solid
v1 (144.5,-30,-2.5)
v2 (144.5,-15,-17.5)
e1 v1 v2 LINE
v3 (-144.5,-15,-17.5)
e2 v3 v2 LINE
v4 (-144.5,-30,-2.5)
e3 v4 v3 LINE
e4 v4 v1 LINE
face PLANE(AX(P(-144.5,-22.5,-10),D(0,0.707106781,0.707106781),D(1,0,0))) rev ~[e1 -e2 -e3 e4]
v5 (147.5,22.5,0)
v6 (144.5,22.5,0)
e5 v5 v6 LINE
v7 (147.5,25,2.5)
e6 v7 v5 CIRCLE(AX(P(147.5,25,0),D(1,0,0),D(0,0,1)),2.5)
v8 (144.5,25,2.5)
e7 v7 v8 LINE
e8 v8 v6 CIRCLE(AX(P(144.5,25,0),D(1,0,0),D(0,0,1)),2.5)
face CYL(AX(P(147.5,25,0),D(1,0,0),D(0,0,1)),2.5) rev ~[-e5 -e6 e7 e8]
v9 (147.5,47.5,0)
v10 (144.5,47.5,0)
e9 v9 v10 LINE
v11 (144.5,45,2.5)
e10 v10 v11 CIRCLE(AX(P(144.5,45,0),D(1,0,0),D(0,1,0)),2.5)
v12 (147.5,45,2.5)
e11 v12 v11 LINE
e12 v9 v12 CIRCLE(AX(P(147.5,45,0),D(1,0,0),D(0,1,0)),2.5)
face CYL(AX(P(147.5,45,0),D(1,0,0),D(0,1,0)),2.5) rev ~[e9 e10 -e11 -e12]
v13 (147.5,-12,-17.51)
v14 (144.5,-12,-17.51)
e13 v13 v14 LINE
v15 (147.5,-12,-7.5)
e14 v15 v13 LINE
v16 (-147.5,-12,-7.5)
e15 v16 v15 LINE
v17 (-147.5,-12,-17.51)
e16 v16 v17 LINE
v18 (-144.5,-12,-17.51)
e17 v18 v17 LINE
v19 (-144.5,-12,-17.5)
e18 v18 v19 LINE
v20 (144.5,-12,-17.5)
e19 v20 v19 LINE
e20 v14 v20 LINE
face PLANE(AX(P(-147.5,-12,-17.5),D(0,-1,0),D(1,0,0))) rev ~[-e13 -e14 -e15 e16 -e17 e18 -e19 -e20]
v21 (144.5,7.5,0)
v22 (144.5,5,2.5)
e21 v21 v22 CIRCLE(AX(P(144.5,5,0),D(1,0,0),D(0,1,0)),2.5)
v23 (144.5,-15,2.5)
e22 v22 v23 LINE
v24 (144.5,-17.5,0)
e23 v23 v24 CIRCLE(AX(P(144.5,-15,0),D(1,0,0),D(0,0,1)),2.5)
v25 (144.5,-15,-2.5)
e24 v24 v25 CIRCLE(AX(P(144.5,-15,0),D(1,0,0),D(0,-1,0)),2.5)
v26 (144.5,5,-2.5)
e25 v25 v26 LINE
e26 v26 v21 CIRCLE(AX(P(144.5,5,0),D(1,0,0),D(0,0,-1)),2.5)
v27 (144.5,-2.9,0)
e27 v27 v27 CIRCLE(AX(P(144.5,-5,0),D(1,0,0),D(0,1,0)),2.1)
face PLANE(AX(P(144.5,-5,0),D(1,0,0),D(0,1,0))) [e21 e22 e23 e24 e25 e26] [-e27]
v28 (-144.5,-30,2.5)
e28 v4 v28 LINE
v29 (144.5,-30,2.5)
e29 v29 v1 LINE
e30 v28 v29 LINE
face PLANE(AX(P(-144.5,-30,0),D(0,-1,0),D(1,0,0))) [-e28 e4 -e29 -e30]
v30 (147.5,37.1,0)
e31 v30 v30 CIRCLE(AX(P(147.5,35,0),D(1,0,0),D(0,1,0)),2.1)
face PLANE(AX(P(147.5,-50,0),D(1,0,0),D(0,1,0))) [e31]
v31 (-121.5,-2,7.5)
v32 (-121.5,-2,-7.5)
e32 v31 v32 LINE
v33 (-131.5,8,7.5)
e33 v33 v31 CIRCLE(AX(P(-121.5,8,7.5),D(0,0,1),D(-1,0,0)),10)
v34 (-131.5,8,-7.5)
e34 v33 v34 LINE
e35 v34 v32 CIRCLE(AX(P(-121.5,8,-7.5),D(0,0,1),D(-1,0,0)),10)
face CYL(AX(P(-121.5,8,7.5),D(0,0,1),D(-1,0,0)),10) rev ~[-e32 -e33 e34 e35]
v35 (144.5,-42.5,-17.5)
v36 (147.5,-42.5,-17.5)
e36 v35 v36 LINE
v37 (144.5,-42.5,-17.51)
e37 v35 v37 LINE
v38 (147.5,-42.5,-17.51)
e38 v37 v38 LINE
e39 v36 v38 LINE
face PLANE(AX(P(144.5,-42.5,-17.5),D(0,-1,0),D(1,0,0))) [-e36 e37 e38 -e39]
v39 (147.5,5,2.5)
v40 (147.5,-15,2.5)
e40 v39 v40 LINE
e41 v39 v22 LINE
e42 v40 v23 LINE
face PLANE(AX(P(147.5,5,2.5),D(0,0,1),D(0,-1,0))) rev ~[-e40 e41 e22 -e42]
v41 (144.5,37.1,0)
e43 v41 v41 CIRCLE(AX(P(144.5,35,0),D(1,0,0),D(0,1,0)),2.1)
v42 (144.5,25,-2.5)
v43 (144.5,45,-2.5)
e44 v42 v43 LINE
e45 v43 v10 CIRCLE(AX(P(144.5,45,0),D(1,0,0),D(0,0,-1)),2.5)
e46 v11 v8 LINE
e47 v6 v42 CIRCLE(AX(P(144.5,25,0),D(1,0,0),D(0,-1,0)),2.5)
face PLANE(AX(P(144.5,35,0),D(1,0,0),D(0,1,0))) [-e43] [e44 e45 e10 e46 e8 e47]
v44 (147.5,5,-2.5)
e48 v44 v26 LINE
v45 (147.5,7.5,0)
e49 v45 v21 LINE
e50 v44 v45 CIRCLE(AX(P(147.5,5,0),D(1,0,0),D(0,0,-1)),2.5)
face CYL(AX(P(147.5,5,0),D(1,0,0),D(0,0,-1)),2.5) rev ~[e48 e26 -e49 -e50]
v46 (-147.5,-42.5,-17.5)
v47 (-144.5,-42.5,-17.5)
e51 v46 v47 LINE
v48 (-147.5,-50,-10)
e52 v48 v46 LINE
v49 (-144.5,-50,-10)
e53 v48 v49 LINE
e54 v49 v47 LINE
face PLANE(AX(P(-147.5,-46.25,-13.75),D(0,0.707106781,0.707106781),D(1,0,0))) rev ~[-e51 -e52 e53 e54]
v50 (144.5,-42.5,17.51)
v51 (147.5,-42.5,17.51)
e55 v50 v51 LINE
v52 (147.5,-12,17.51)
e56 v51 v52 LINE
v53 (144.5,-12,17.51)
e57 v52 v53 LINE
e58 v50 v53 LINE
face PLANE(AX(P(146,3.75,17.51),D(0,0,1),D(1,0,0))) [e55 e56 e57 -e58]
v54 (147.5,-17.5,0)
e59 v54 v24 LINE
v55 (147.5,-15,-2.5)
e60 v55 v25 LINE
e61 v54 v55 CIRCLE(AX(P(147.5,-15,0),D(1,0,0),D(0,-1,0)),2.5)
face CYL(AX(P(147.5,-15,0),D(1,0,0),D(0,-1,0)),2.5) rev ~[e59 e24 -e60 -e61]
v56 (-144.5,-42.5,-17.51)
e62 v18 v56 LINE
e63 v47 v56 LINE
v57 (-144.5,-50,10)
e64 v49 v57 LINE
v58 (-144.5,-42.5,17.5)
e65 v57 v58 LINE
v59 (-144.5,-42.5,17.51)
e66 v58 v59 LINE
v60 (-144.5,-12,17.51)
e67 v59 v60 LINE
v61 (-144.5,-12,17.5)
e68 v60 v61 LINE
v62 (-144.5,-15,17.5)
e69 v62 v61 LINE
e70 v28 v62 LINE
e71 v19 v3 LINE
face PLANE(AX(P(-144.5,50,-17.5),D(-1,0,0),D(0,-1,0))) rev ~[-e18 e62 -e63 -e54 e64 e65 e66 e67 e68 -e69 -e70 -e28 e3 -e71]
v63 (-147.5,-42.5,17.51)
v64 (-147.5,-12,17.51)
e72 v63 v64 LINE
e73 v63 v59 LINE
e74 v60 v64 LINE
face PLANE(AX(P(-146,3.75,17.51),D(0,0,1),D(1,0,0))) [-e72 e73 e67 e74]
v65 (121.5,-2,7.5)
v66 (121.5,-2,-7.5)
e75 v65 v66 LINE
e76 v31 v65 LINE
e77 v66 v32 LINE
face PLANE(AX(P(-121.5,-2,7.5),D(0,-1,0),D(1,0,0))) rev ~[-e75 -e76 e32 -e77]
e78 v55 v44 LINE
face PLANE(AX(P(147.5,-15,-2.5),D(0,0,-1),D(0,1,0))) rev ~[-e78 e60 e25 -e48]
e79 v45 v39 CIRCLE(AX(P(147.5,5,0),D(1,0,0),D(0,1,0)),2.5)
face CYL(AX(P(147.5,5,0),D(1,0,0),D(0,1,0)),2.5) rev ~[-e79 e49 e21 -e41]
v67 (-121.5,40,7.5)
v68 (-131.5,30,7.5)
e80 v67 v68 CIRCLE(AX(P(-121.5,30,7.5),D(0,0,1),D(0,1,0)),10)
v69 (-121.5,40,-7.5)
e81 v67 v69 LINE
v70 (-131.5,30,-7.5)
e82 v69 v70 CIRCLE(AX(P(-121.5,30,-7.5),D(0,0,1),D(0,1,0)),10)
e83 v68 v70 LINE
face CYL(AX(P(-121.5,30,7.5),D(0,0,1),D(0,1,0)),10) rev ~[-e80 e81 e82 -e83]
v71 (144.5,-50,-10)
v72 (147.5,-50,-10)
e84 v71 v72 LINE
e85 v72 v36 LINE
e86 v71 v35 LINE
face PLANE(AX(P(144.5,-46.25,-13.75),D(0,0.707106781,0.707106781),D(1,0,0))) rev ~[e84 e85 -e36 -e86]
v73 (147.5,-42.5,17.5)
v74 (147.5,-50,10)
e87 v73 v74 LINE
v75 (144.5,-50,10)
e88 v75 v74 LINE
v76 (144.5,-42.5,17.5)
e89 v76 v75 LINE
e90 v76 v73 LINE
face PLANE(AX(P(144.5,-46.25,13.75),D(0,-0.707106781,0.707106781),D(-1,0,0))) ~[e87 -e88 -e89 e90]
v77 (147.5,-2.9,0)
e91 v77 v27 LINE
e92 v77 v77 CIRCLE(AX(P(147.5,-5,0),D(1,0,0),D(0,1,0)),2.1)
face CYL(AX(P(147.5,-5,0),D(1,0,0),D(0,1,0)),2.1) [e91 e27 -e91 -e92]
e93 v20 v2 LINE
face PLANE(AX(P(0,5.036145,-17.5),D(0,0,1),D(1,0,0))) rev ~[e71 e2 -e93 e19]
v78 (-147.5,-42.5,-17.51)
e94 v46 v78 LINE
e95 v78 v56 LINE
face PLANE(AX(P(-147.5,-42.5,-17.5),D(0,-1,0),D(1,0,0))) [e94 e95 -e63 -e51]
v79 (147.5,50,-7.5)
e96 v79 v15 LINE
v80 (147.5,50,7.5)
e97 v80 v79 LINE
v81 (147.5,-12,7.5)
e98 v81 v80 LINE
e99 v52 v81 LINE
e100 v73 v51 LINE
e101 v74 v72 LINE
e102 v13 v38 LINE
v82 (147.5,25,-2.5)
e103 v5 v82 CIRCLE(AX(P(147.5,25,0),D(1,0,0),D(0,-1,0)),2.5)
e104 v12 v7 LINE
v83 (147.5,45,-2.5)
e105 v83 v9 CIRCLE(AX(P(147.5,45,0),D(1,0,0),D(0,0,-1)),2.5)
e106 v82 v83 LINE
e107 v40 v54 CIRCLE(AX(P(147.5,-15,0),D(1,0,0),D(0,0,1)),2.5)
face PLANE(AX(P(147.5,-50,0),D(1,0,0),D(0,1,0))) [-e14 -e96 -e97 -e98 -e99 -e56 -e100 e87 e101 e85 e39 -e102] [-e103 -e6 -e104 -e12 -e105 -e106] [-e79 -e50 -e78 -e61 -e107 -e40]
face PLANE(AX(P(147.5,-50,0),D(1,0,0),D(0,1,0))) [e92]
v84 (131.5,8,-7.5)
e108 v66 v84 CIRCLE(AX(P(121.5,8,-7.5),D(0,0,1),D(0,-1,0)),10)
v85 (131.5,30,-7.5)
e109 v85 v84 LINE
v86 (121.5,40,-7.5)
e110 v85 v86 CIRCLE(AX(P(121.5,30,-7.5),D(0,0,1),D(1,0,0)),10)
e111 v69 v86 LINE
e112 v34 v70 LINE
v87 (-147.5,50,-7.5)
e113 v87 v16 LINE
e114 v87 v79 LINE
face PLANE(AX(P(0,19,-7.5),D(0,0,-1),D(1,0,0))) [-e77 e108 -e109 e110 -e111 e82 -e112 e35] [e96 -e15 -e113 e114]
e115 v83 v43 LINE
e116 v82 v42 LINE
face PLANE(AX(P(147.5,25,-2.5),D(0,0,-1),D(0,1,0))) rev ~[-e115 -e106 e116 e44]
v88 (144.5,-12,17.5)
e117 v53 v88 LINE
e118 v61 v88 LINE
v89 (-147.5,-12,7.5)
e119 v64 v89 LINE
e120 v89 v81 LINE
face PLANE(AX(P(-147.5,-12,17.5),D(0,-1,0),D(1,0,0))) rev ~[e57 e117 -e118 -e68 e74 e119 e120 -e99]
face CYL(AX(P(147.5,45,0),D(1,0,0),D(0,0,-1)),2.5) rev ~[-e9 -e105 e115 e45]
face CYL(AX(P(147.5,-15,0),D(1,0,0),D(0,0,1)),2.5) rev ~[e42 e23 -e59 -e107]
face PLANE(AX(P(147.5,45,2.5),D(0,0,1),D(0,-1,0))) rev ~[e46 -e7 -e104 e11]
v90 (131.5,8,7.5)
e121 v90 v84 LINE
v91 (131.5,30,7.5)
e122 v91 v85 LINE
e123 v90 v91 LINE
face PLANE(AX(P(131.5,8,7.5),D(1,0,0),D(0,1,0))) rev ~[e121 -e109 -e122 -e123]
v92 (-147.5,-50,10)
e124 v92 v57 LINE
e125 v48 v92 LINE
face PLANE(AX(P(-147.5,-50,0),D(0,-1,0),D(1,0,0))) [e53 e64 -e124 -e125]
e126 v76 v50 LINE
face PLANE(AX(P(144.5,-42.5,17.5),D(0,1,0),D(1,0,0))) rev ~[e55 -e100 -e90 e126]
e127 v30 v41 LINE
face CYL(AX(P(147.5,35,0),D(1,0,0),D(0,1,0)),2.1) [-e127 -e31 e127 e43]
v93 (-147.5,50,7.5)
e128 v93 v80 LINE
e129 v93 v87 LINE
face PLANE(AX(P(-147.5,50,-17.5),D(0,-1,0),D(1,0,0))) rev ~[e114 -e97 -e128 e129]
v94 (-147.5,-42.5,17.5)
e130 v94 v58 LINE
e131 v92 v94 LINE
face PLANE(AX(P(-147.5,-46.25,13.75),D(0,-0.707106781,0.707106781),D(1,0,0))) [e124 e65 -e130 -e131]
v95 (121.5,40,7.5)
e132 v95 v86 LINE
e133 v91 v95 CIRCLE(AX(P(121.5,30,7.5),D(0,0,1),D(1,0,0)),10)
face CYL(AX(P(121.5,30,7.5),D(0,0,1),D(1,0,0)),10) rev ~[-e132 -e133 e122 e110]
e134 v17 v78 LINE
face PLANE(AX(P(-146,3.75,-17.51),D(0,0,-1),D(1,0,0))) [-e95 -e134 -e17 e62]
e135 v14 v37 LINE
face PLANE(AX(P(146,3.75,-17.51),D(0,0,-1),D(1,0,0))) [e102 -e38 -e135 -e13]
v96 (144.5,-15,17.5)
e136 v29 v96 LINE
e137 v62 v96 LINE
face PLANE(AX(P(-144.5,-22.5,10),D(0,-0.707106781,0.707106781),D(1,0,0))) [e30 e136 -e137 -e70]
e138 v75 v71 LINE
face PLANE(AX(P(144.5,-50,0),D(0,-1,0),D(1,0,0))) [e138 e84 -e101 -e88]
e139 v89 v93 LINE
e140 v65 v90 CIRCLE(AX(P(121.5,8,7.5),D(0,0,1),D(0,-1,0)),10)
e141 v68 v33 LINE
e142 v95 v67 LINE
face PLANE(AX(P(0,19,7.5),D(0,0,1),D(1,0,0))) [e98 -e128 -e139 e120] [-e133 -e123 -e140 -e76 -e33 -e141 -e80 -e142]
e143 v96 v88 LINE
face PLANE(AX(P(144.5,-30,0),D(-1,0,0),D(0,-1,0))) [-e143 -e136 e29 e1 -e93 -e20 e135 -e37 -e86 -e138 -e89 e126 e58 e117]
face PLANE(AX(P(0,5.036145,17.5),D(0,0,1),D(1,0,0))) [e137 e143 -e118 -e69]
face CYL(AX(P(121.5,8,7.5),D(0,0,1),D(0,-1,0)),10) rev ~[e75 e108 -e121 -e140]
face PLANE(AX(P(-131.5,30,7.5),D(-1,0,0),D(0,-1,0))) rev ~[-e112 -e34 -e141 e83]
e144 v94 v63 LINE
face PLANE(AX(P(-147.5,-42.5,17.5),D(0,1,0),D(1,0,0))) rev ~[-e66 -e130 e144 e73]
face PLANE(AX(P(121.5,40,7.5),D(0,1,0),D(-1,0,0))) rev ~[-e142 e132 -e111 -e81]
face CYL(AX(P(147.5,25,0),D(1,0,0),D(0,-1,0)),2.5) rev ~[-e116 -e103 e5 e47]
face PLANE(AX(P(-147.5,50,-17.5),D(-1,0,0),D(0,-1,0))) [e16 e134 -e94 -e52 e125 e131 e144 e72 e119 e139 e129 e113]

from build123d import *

# Parameters (mm, degrees)
F1_DEPTH       = 17.5
F1_DEPTH_BACK  = 17.5
F2_SIZE        = 15
F3_SIZE        = 7.5
F5_W           = 3
F5_H           = 92.5
F6_DEPTH       = 0.01
F7_W           = 3
F7_H           = 92.5
F8_DEPTH       = 0.01
F4_R           = 2.1
F9_DEPTH       = 3
F11_DEPTH      = 10
F13_DEPTH      = 10
F15_DEPTH      = 25
F16_W          = 295
F16_H          = 62
F17_DEPTH      = 10
F17_DEPTH_BACK = 25
F18_W          = 295
F18_H          = 62
F19_DEPTH      = 10
F19_DEPTH_BACK = 25


with BuildPart() as f1:
    # F0 (on Top) → F1 (new body, two sides)
    with BuildSketch(Plane.XY) as f1_sk:
        Polygon((147.5, -50), (147.5, 50), (-147.5, 50), (-147.5, -50), (-144.5, -50), (-144.5, -30), (144.5, -30), (144.5, -50), align=None)
    extrude(amount=F1_DEPTH)
    extrude(f1_sk.sketch, amount=-F1_DEPTH_BACK)

    # F2
    f2_edges = [f1.edges().sort_by_distance(p)[0] for p in [
        (0, -30, 17.5),
        (0, -30, -17.5),
    ]]
    chamfer(f2_edges, length=F2_SIZE)

    # F3
    f3_edges = [f1.edges().sort_by_distance(p)[0] for p in [
        (146, -50, 17.5),
        (146, -50, -17.5),
        (-146, -50, 17.5),
        (-146, -50, -17.5),
    ]]
    chamfer(f3_edges, length=F3_SIZE)

    # F5 (on face) → F6 (join)
    with BuildSketch(Plane.XY.offset(17.5)):
        with Locations((-146, 3.75)):
            Rectangle(F5_W, F5_H)
        with Locations((146, 3.75)):
            Rectangle(F5_W, F5_H)
    extrude(amount=F6_DEPTH)

    # F7 (on face) → F8 (join)
    with BuildSketch(Plane(origin=(0, 0, -17.5), x_dir=(1, 0, 0), z_dir=(0, 0, -1))):
        with Locations((-146, -3.75)):
            Rectangle(F7_W, F7_H)
        with Locations((146, -3.75)):
            Rectangle(F7_W, F7_H)
    extrude(amount=F8_DEPTH)

    # F4 (on face) → F9 (cut)
    with BuildSketch(Plane.YZ.offset(147.5)):
        with BuildLine():
            ThreePointArc((47.5, 0), (46.767766953, 1.767766953), (45, 2.5))
            Line((45, 2.5), (25, 2.5))
            ThreePointArc((25, 2.5), (23.232233047, 1.767766953), (22.5, 0))
            ThreePointArc((22.5, 0), (23.232233047, -1.767766953), (25, -2.5))
            Line((25, -2.5), (45, -2.5))
            ThreePointArc((45, -2.5), (46.767766953, -1.767766953), (47.5, 0))
        make_face()
        with Locations((35, 0)):
            Circle(F4_R, mode=Mode.SUBTRACT)
        with BuildLine():
            ThreePointArc((7.5, 0), (6.767766953, 1.767766953), (5, 2.5))
            Line((5, 2.5), (-15, 2.5))
            ThreePointArc((-15, 2.5), (-16.767766953, 1.767766953), (-17.5, 0))
            ThreePointArc((-17.5, 0), (-16.767766953, -1.767766953), (-15, -2.5))
            Line((-15, -2.5), (5, -2.5))
            ThreePointArc((5, -2.5), (6.767766953, -1.767766953), (7.5, 0))
        make_face()
        with Locations((-5, 0)):
            Circle(F4_R, mode=Mode.SUBTRACT)
    extrude(amount=-F9_DEPTH, mode=Mode.SUBTRACT)

    # F10 (on face) → F11 (cut)
    with BuildSketch(Plane.XY.offset(17.5)):
        with BuildLine():
            Line((141.5, 50), (-141.5, 50))
            Line((-141.5, 50), (-141.5, -2))
            ThreePointArc((-141.5, -2), (-138.5710678119, -9.0710678119), (-131.5, -12))
            Line((-131.5, -12), (131.5, -12))
            ThreePointArc((131.5, -12), (138.5710678119, -9.0710678119), (141.5, -2))
            Line((141.5, -2), (141.5, 50))
        make_face()
    extrude(amount=-F11_DEPTH, mode=Mode.SUBTRACT)

    # F12 (on face) → F13 (cut)
    with BuildSketch(Plane(origin=(0, 0, -17.5), x_dir=(1, 0, 0), z_dir=(0, 0, -1))):
        with BuildLine():
            Line((141.5, -50), (141.5, 2))
            ThreePointArc((141.5, 2), (138.5710678119, 9.0710678119), (131.5, 12))
            Line((131.5, 12), (-131.5, 12))
            ThreePointArc((-131.5, 12), (-138.5710678119, 9.0710678119), (-141.5, 2))
            Line((-141.5, 2), (-141.5, -50))
            Line((-141.5, -50), (141.5, -50))
        make_face()
    extrude(amount=-F13_DEPTH, mode=Mode.SUBTRACT)

    # F14 (on face) → F15 (cut)
    with BuildSketch(Plane.XY.offset(7.5)):
        with BuildLine():
            Line((121.5, 40), (-121.5, 40))
            ThreePointArc((-121.5, 40), (-128.5710678119, 37.0710678119), (-131.5, 30))
            Line((-131.5, 30), (-131.5, 8))
            ThreePointArc((-131.5, 8), (-128.5710678119, 0.9289321881), (-121.5, -2))
            Line((-121.5, -2), (121.5, -2))
            ThreePointArc((121.5, -2), (128.5710678119, 0.9289321881), (131.5, 8))
            Line((131.5, 8), (131.5, 30))
            ThreePointArc((131.5, 30), (128.5710678119, 37.0710678119), (121.5, 40))
        make_face()
    extrude(amount=-F15_DEPTH, mode=Mode.SUBTRACT)

    # F16 (on face) → F17 (cut, two sides)
    with BuildSketch(Plane.XY.offset(17.5)) as f17_sk:
        with Locations((0, 19)):
            Rectangle(F16_W, F16_H)
    extrude(amount=-F17_DEPTH, mode=Mode.SUBTRACT)
    extrude(f17_sk.sketch, amount=F17_DEPTH_BACK, mode=Mode.SUBTRACT)

    # F18 (on face) → F19 (cut, two sides)
    with BuildSketch(Plane(origin=(0, 0, -17.5), x_dir=(1, 0, 0), z_dir=(0, 0, -1))) as f19_sk:
        with Locations((0, -19)):
            Rectangle(F18_W, F18_H)
    extrude(amount=-F19_DEPTH, mode=Mode.SUBTRACT)
    extrude(f19_sk.sketch, amount=F19_DEPTH_BACK, mode=Mode.SUBTRACT)


solid = f1.part
